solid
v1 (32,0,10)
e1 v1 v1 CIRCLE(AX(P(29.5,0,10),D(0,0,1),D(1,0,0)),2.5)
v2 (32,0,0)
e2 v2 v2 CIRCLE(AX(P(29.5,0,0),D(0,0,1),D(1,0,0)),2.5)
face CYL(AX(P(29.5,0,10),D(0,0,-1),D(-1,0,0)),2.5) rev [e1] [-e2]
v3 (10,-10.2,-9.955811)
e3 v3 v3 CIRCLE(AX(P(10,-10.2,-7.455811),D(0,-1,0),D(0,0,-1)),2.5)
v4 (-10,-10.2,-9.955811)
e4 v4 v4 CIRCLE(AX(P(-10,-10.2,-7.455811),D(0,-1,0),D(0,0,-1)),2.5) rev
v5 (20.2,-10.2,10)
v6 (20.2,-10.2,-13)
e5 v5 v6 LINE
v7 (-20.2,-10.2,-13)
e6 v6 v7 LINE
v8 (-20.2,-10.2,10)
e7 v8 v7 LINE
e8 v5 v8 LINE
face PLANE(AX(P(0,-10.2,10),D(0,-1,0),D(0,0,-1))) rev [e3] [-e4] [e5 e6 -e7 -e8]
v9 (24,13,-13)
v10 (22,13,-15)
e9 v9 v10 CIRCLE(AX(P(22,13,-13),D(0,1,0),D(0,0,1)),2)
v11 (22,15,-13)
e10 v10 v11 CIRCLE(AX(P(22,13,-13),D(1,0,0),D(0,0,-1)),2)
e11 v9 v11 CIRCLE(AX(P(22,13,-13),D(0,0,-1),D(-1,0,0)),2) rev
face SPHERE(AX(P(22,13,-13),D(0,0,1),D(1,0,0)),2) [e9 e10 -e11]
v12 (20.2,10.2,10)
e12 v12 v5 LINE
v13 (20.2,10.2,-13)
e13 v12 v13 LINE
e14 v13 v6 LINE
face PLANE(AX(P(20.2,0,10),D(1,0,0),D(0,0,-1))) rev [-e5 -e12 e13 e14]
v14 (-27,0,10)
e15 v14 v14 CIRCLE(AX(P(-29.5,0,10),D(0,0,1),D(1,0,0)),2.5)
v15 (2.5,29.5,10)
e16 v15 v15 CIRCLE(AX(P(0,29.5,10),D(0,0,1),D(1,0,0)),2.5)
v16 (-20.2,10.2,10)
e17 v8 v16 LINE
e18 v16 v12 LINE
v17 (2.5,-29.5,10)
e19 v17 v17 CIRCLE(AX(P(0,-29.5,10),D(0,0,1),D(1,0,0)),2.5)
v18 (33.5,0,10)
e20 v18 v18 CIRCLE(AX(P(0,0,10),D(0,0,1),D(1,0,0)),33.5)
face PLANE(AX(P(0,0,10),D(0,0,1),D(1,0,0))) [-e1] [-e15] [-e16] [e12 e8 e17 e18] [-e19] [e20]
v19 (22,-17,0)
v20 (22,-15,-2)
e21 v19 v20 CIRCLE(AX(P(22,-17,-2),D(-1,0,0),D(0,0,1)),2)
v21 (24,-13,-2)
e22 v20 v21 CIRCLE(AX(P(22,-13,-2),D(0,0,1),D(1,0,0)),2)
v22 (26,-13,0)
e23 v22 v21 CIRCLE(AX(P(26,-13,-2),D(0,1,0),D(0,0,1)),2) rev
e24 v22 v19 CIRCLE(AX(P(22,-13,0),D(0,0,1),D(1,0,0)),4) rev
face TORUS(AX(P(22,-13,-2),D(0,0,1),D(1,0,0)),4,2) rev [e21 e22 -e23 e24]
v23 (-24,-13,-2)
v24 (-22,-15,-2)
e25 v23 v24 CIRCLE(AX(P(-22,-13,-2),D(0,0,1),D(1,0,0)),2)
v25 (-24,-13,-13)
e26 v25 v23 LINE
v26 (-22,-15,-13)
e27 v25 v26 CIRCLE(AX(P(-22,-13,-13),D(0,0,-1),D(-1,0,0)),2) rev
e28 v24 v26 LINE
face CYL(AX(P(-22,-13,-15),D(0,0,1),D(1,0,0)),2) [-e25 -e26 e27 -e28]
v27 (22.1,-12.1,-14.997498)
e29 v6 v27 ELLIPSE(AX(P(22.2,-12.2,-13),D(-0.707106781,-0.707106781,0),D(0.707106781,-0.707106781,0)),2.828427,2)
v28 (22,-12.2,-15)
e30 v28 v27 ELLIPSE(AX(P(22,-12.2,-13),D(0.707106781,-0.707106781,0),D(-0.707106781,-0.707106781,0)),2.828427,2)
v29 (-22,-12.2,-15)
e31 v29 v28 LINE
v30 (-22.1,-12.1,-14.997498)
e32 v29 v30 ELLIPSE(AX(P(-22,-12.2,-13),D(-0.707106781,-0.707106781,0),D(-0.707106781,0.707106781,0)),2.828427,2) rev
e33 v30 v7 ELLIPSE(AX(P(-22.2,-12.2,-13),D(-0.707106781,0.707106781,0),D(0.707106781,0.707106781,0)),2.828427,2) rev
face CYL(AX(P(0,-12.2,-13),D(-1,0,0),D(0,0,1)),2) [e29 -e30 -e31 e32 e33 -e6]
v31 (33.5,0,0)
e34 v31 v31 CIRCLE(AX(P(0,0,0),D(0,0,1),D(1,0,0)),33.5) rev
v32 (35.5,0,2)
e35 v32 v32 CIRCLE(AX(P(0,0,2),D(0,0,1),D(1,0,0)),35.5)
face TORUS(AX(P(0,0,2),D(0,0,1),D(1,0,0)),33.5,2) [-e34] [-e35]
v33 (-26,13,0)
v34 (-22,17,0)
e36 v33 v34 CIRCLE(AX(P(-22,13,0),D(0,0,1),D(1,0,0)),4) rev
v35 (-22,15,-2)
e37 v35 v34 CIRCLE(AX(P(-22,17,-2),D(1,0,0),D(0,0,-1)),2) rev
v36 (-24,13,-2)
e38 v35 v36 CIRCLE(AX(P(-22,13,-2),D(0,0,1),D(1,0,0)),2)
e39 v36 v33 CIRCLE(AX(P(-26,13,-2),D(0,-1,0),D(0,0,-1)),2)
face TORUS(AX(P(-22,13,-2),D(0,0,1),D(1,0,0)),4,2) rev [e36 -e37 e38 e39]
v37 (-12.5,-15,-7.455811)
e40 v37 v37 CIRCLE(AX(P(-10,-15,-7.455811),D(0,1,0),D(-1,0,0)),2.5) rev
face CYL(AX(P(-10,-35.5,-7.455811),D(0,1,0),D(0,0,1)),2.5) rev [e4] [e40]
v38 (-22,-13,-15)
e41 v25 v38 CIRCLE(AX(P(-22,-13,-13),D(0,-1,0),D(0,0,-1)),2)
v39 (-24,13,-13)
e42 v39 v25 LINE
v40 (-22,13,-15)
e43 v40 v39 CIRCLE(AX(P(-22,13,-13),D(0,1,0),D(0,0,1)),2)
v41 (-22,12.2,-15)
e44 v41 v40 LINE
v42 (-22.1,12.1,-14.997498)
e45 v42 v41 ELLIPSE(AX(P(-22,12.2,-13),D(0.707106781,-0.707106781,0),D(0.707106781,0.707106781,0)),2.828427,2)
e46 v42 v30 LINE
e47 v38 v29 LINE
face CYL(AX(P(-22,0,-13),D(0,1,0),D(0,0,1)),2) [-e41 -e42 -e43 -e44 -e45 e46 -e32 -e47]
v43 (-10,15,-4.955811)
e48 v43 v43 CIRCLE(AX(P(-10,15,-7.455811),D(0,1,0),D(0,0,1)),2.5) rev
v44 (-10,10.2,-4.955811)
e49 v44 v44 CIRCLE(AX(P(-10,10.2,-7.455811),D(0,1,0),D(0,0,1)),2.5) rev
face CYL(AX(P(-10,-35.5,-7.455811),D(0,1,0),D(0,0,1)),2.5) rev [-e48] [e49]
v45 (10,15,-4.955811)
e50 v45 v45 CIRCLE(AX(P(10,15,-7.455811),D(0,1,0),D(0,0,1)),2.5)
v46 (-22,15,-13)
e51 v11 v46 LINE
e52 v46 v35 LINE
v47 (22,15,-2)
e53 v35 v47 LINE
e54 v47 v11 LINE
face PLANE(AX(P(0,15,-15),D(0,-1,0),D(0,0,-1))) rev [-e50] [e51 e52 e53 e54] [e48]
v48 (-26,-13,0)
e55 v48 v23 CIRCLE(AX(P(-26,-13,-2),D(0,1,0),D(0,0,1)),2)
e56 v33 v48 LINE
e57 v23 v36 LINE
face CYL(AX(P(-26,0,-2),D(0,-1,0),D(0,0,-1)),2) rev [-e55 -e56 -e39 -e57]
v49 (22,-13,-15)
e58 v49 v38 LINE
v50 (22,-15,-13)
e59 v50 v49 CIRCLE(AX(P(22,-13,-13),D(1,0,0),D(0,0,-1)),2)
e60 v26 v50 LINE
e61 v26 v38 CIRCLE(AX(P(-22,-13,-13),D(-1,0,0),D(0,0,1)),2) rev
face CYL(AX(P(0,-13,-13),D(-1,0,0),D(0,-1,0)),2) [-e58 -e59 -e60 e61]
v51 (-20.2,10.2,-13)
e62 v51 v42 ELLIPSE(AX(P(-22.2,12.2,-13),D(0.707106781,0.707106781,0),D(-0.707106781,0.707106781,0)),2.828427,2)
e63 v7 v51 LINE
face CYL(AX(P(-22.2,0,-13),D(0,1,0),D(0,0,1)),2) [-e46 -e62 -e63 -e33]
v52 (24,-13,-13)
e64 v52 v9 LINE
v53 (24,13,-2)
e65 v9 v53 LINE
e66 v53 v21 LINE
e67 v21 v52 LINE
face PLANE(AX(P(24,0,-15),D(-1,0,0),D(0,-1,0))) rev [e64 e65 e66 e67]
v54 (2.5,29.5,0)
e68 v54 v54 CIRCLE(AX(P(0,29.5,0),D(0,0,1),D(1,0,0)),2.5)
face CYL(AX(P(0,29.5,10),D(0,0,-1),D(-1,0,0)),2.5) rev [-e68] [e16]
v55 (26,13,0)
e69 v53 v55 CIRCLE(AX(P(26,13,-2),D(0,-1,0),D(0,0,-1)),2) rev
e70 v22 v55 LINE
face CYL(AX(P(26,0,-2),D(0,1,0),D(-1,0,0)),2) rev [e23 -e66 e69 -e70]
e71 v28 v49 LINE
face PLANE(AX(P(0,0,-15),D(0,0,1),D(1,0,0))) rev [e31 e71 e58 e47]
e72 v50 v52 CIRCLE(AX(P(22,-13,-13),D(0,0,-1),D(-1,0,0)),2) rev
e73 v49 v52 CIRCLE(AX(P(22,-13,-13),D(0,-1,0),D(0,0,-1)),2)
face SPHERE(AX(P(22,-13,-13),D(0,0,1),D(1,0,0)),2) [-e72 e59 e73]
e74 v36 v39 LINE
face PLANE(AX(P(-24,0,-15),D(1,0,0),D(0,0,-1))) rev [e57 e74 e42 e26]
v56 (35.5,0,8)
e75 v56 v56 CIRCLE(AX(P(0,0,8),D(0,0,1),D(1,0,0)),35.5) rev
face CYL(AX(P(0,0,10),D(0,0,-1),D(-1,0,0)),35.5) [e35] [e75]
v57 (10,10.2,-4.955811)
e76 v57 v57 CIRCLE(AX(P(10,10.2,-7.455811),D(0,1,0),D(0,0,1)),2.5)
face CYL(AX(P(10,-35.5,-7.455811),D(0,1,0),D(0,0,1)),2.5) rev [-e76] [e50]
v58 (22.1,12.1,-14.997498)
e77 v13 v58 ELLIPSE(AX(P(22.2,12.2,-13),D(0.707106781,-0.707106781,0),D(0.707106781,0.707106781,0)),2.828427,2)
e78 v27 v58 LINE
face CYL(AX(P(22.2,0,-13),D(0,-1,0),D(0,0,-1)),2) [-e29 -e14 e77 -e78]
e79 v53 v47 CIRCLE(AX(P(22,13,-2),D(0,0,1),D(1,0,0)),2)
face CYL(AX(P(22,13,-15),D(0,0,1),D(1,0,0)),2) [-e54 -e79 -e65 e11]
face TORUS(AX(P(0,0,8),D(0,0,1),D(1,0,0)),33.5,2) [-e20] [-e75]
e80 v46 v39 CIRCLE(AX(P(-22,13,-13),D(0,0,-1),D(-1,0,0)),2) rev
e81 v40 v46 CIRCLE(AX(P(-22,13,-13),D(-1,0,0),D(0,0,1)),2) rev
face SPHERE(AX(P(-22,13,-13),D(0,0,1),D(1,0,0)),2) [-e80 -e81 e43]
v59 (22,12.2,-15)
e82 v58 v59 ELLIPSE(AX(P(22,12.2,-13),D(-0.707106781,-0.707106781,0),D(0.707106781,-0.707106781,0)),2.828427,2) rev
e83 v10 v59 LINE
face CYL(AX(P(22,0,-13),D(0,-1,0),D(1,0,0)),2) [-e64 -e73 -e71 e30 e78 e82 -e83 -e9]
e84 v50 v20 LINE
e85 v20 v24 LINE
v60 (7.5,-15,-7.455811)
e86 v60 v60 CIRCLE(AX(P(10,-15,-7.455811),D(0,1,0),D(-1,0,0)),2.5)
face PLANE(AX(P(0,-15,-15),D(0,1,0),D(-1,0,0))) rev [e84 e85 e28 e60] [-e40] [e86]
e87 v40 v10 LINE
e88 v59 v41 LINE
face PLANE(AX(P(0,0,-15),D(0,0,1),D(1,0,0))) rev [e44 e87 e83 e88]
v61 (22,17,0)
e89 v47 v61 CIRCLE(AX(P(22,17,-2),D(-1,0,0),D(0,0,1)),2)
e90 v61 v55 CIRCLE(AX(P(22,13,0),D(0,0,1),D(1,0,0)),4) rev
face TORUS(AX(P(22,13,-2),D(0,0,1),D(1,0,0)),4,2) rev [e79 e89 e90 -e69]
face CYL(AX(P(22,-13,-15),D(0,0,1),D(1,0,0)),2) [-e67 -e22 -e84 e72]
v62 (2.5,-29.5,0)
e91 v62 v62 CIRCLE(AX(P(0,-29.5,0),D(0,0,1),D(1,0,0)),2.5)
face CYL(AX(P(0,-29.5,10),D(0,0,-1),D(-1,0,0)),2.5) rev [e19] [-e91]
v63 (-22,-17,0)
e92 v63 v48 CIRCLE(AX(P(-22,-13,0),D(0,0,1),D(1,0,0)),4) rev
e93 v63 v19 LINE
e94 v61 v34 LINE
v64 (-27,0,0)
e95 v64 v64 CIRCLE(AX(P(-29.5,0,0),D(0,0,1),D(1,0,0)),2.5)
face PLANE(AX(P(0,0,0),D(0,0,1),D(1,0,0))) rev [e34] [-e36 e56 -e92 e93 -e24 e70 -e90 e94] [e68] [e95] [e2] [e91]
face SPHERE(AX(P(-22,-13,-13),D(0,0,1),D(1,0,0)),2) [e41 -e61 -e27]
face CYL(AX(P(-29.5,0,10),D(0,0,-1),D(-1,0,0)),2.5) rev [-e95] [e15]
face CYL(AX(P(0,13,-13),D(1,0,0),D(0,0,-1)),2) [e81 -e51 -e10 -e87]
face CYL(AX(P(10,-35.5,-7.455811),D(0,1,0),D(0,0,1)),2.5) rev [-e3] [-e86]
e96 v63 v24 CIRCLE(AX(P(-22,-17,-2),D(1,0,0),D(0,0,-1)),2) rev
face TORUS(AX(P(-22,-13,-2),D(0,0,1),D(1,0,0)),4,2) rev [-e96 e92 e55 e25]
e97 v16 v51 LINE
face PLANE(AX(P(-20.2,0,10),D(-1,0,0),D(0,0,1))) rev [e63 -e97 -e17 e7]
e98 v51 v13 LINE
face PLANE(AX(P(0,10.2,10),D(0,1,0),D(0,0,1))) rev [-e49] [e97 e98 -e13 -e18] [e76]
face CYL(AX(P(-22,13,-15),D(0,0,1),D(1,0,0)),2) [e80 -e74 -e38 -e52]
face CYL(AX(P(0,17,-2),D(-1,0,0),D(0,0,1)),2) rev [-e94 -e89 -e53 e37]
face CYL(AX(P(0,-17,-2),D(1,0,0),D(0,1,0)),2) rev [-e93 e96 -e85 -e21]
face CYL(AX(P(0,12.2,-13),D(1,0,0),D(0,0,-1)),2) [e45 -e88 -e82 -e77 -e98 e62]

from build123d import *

# Parameters (mm, degrees)
SKETCH_1_R          = 35.5
SKETCH_1_W          = 40.4
SKETCH_1_H          = 20.4
SKETCH_1_R_2        = 2.5
EXTRUDE_1_DEPTH     = 10
EXTRUDE_2_DEPTH     = 15
FILLET_1_R          = 2
SKETCH_3_R          = 2.5
CUT_EXTRUDE_1_DEPTH = 64.525585397
FILLET_2_R          = 2


with BuildPart() as part:
    # 草图1 → 凸台-拉伸1 (new body)
    with BuildSketch(Plane.XY):
        Circle(SKETCH_1_R)
        Rectangle(SKETCH_1_W, SKETCH_1_H, mode=Mode.SUBTRACT)
        with Locations((29.5, 0)):
            Circle(SKETCH_1_R_2, mode=Mode.SUBTRACT)
        with Locations((0, 29.5)):
            Circle(SKETCH_1_R_2, mode=Mode.SUBTRACT)
        with Locations((-29.5, 0)):
            Circle(SKETCH_1_R_2, mode=Mode.SUBTRACT)
        with Locations((0, -29.5)):
            Circle(SKETCH_1_R_2, mode=Mode.SUBTRACT)
    extrude(amount=EXTRUDE_1_DEPTH)

    # 草图1<5> → 凸台-拉伸2 (add)
    # profile 1 of 3: a face of its own
    with BuildSketch(Plane.XY):
        with BuildLine():
            Line((18.090052515, 15), (0, 15))
            Line((0, 15), (-18.090052515, 15))
            ThreePointArc((-18.090052515, 15), (-23.5, 0), (-18.090052515, -15))
            Line((-18.090052515, -15), (18.090052515, -15))
            ThreePointArc((18.090052515, -15), (22.106178255, -7.97288423), (23.5, 0))
            ThreePointArc((23.5, 0), (22.106178255, 7.97288423), (18.090052515, 15))
        make_face()
        Polygon((-20.2, -10.2), (-20.2, 0), (-20.2, 10.2), (0, 10.2), (20.2, 10.2), (20.2, 0), (20.2, -10.2), align=None, mode=Mode.SUBTRACT)
    # profile 2 of 3: a face of its own
    with BuildSketch(Plane.XY):
        with BuildLine():
            Line((24, 15), (18.090052515, 15))
            ThreePointArc((18.090052515, 15), (22.106178255, 7.97288423), (23.5, 0))
            ThreePointArc((23.5, 0), (22.106178255, -7.97288423), (18.090052515, -15))
            Line((18.090052515, -15), (24, -15))
            Line((24, -15), (24, 15))
        make_face()
    # profile 3 of 3: a face of its own
    with BuildSketch(Plane.XY):
        with BuildLine():
            ThreePointArc((-18.090052515, -15), (-23.5, 0), (-18.090052515, 15))
            Line((-18.090052515, 15), (-24, 15))
            Line((-24, 15), (-24, -15))
            Line((-24, -15), (-18.090052515, -15))
        make_face()
    extrude(amount=-EXTRUDE_2_DEPTH)

    # 圆角1
    # the kernel refuses this fillet: 2 mm, written as the material it takes off along each edge
    with BuildSketch(Plane(origin=(-22, 13, -13), x_dir=(0, 1, 0), z_dir=(-1, 0, 0))) as fillet_1_piece_1_section:
        Polygon((0, 0), (FILLET_1_R, 0), (FILLET_1_R, FILLET_1_R), (0, FILLET_1_R), align=None)
    fillet_1_piece_1 = extrude(amount=FILLET_1_R, mode=Mode.PRIVATE)
    fillet_1_piece_1 = fillet_1_piece_1 - Plane(origin=(-22, 13, -13), x_dir=(0, -0.7071067811865475, 0.7071067811865475), z_dir=(-1, 0, 0)) * Sphere(FILLET_1_R, mode=Mode.PRIVATE)
    add(fillet_1_piece_1, mode=Mode.SUBTRACT)
    with BuildSketch(Plane(origin=(22, 13, -13), x_dir=(1, 0, 0), z_dir=(0, 1, 0))) as fillet_1_piece_2_section:
        Polygon((0, 0), (FILLET_1_R, 0), (FILLET_1_R, FILLET_1_R), (0, FILLET_1_R), align=None)
    fillet_1_piece_2 = extrude(amount=FILLET_1_R, mode=Mode.PRIVATE)
    fillet_1_piece_2 = fillet_1_piece_2 - Plane(origin=(22, 13, -13), x_dir=(-0.7071067811865475, 0, 0.7071067811865475), z_dir=(0, 1, 0)) * Sphere(FILLET_1_R, mode=Mode.PRIVATE)
    add(fillet_1_piece_2, mode=Mode.SUBTRACT)
    with BuildSketch(Plane(origin=(22, -13, -13), x_dir=(0, -1, 0), z_dir=(1, 0, 0))) as fillet_1_piece_3_section:
        Polygon((0, 0), (FILLET_1_R, 0), (FILLET_1_R, FILLET_1_R), (0, FILLET_1_R), align=None)
    fillet_1_piece_3 = extrude(amount=FILLET_1_R, mode=Mode.PRIVATE)
    fillet_1_piece_3 = fillet_1_piece_3 - Plane(origin=(22, -13, -13), x_dir=(0, 0.7071067811865475, 0.7071067811865475), z_dir=(1, 0, 0)) * Sphere(FILLET_1_R, mode=Mode.PRIVATE)
    add(fillet_1_piece_3, mode=Mode.SUBTRACT)
    with BuildSketch(Plane(origin=(-22, -13, -13), x_dir=(0, -1, 0), z_dir=(-1, 0, 0))) as fillet_1_piece_4_section:
        Polygon((0, 0), (FILLET_1_R, 0), (FILLET_1_R, -FILLET_1_R), (0, -FILLET_1_R), align=None)
    fillet_1_piece_4 = extrude(amount=FILLET_1_R, mode=Mode.PRIVATE)
    fillet_1_piece_4 = fillet_1_piece_4 - Plane(origin=(-22, -13, -13), x_dir=(0, 0.7071067811865475, 0.7071067811865475), z_dir=(-1, 0, 0)) * Sphere(FILLET_1_R, mode=Mode.PRIVATE)
    add(fillet_1_piece_4, mode=Mode.SUBTRACT)
    with BuildSketch(Plane(origin=(-24, 15, 0), x_dir=(0, -1, 0), z_dir=(0, 0, -1)), Plane(origin=(24, 15, 0), x_dir=(-1, 0, 0), z_dir=(0, 0, -1)), Plane(origin=(24, -15, 0), x_dir=(0, 1, 0), z_dir=(0, 0, -1))) as fillet_1_piece_5:
        with BuildLine():
            CenterArc((FILLET_1_R, -FILLET_1_R), FILLET_1_R, 90, 90)
            Line((0, -FILLET_1_R), (0, 0))
            Line((0, 0), (FILLET_1_R, 0))
        make_face()
    extrude(amount=13, mode=Mode.SUBTRACT)
    with BuildSketch(Plane(origin=(20.2, -10.2, -15), x_dir=(0, -1, 0), z_dir=(-1, 0, 0)), Plane(origin=(-20.2, 10.2, -15), x_dir=(0, 1, 0), z_dir=(1, 0, 0))) as fillet_1_piece_6:
        with BuildLine():
            CenterArc((FILLET_1_R, FILLET_1_R), FILLET_1_R, 180, 90)
            Line((0, FILLET_1_R), (0, 0))
            Line((0, 0), (FILLET_1_R, 0))
        make_face()
    extrude(amount=40.4, mode=Mode.SUBTRACT)
    with BuildSketch(Plane(origin=(20.2, 10.2, -15), x_dir=(1, 0, 0), z_dir=(0, -1, 0))) as fillet_1_piece_7:
        with BuildLine():
            CenterArc((FILLET_1_R, FILLET_1_R), FILLET_1_R, 180, 90)
            Line((0, FILLET_1_R), (0, 0))
            Line((0, 0), (FILLET_1_R, 0))
        make_face()
    extrude(amount=20.4, mode=Mode.SUBTRACT)
    with BuildSketch(Plane(origin=(-20.2, -10.2, -15), x_dir=(0, 0, 1), z_dir=(0, 1, 0))) as fillet_1_piece_8:
        with BuildLine():
            CenterArc((FILLET_1_R, -FILLET_1_R), FILLET_1_R, 90, 90)
            Line((0, -FILLET_1_R), (0, 0))
            Line((0, 0), (FILLET_1_R, 0))
        make_face()
    extrude(amount=20.4, mode=Mode.SUBTRACT)
    with BuildSketch(Plane(origin=(-24, -15, 0), x_dir=(0, 1, 0), z_dir=(0, 0, -1))) as fillet_1_piece_9:
        with BuildLine():
            CenterArc((FILLET_1_R, FILLET_1_R), FILLET_1_R, 180, 90)
            Line((0, FILLET_1_R), (0, 0))
            Line((0, 0), (FILLET_1_R, 0))
        make_face()
    extrude(amount=13, mode=Mode.SUBTRACT)
    with BuildSketch(Plane(origin=(22, 15, -15), x_dir=(0, -1, 0), z_dir=(-1, 0, 0))) as fillet_1_piece_10:
        with BuildLine():
            CenterArc((FILLET_1_R, FILLET_1_R), FILLET_1_R, 180, 90)
            Line((0, FILLET_1_R), (0, 0))
            Line((0, 0), (FILLET_1_R, 0))
        make_face()
    extrude(amount=44, mode=Mode.SUBTRACT)
    with BuildSketch(Plane(origin=(24, -13, -15), x_dir=(-1, 0, 0), z_dir=(0, 1, 0)), Plane(origin=(-24, 13, -15), x_dir=(1, 0, 0), z_dir=(0, -1, 0))) as fillet_1_piece_11:
        with BuildLine():
            CenterArc((FILLET_1_R, FILLET_1_R), FILLET_1_R, 180, 90)
            Line((0, FILLET_1_R), (0, 0))
            Line((0, 0), (FILLET_1_R, 0))
        make_face()
    extrude(amount=26, mode=Mode.SUBTRACT)
    with BuildSketch(Plane(origin=(22, -15, -15), x_dir=(0, 1, 0), z_dir=(-1, 0, 0))) as fillet_1_piece_12:
        with BuildLine():
            CenterArc((FILLET_1_R, -FILLET_1_R), FILLET_1_R, 90, 90)
            Line((0, -FILLET_1_R), (0, 0))
            Line((0, 0), (FILLET_1_R, 0))
        make_face()
    extrude(amount=44, mode=Mode.SUBTRACT)
    with BuildSketch(Plane(origin=(25.2, -10.2, -15), x_dir=(0, -1, 0), z_dir=(-1, 0, 0))) as fillet_1_piece_13a_section:
        with BuildLine():
            CenterArc((FILLET_1_R, FILLET_1_R), FILLET_1_R, 180, 90)
            Line((0, FILLET_1_R), (0, 0))
            Line((0, 0), (FILLET_1_R, 0))
        make_face()
    fillet_1_piece_13a = extrude(amount=45.4, mode=Mode.PRIVATE)
    fillet_1_piece_13a = split(fillet_1_piece_13a, bisect_by=Plane(origin=(20.2, -10.652790229, -14.547209771), z_dir=(1, 0, 0)), keep=Keep.TOP, mode=Mode.PRIVATE)
    with BuildSketch(Plane(origin=(20.2, 10.2, -15), x_dir=(1, 0, 0), z_dir=(0, -1, 0))) as fillet_1_piece_13b_section:
        with BuildLine():
            CenterArc((FILLET_1_R, FILLET_1_R), FILLET_1_R, 180, 90)
            Line((0, FILLET_1_R), (0, 0))
            Line((0, 0), (FILLET_1_R, 0))
        make_face()
    fillet_1_piece_13b = extrude(amount=25.4, mode=Mode.PRIVATE)
    fillet_1_piece_13b = split(fillet_1_piece_13b, bisect_by=Plane(origin=(20.652790229, -10.2, -14.547209771), z_dir=(0, -1, 0)), keep=Keep.TOP, mode=Mode.PRIVATE)
    fillet_1_piece_13 = fillet_1_piece_13a & fillet_1_piece_13b
    add(fillet_1_piece_13, mode=Mode.SUBTRACT)
    with BuildSketch(Plane(origin=(-20.2, -15.2, -15), x_dir=(0, 0, 1), z_dir=(0, 1, 0))) as fillet_1_piece_14a_section:
        with BuildLine():
            CenterArc((FILLET_1_R, -FILLET_1_R), FILLET_1_R, 90, 90)
            Line((0, -FILLET_1_R), (0, 0))
            Line((0, 0), (FILLET_1_R, 0))
        make_face()
    fillet_1_piece_14a = extrude(amount=25.4, mode=Mode.PRIVATE)
    fillet_1_piece_14a = split(fillet_1_piece_14a, bisect_by=Plane(origin=(-20.652790229, -10.2, -14.547209771), z_dir=(0, -1, 0)), keep=Keep.TOP, mode=Mode.PRIVATE)
    with BuildSketch(Plane(origin=(20.2, -10.2, -15), x_dir=(0, -1, 0), z_dir=(-1, 0, 0))) as fillet_1_piece_14b_section:
        with BuildLine():
            CenterArc((FILLET_1_R, FILLET_1_R), FILLET_1_R, 180, 90)
            Line((0, FILLET_1_R), (0, 0))
            Line((0, 0), (FILLET_1_R, 0))
        make_face()
    fillet_1_piece_14b = extrude(amount=45.4, mode=Mode.PRIVATE)
    fillet_1_piece_14b = split(fillet_1_piece_14b, bisect_by=Plane(origin=(-20.2, -10.652790229, -14.547209771), z_dir=(-1, 0, 0)), keep=Keep.TOP, mode=Mode.PRIVATE)
    fillet_1_piece_14 = fillet_1_piece_14a & fillet_1_piece_14b
    add(fillet_1_piece_14, mode=Mode.SUBTRACT)
    with BuildSketch(Plane(origin=(-20.2, 10.2, -15), x_dir=(0, 1, 0), z_dir=(1, 0, 0))) as fillet_1_piece_15a_section:
        with BuildLine():
            CenterArc((FILLET_1_R, FILLET_1_R), FILLET_1_R, 180, 90)
            Line((0, FILLET_1_R), (0, 0))
            Line((0, 0), (FILLET_1_R, 0))
        make_face()
    fillet_1_piece_15a = extrude(amount=45.4, mode=Mode.PRIVATE)
    fillet_1_piece_15a = split(fillet_1_piece_15a, bisect_by=Plane(origin=(20.2, 10.652790229, -14.547209771), z_dir=(1, 0, 0)), keep=Keep.TOP, mode=Mode.PRIVATE)
    with BuildSketch(Plane(origin=(20.2, 15.2, -15), x_dir=(1, 0, 0), z_dir=(0, -1, 0))) as fillet_1_piece_15b_section:
        with BuildLine():
            CenterArc((FILLET_1_R, FILLET_1_R), FILLET_1_R, 180, 90)
            Line((0, FILLET_1_R), (0, 0))
            Line((0, 0), (FILLET_1_R, 0))
        make_face()
    fillet_1_piece_15b = extrude(amount=25.4, mode=Mode.PRIVATE)
    fillet_1_piece_15b = split(fillet_1_piece_15b, bisect_by=Plane(origin=(20.652790229, 10.2, -14.547209771), z_dir=(0, 1, 0)), keep=Keep.TOP, mode=Mode.PRIVATE)
    fillet_1_piece_15 = fillet_1_piece_15a & fillet_1_piece_15b
    add(fillet_1_piece_15, mode=Mode.SUBTRACT)
    with BuildSketch(Plane(origin=(-20.2, -10.2, -15), x_dir=(0, 0, 1), z_dir=(0, 1, 0))) as fillet_1_piece_16a_section:
        with BuildLine():
            CenterArc((FILLET_1_R, -FILLET_1_R), FILLET_1_R, 90, 90)
            Line((0, -FILLET_1_R), (0, 0))
            Line((0, 0), (FILLET_1_R, 0))
        make_face()
    fillet_1_piece_16a = extrude(amount=25.4, mode=Mode.PRIVATE)
    fillet_1_piece_16a = split(fillet_1_piece_16a, bisect_by=Plane(origin=(-20.652790229, 10.2, -14.547209771), z_dir=(0, 1, 0)), keep=Keep.TOP, mode=Mode.PRIVATE)
    with BuildSketch(Plane(origin=(-25.2, 10.2, -15), x_dir=(0, 1, 0), z_dir=(1, 0, 0))) as fillet_1_piece_16b_section:
        with BuildLine():
            CenterArc((FILLET_1_R, FILLET_1_R), FILLET_1_R, 180, 90)
            Line((0, FILLET_1_R), (0, 0))
            Line((0, 0), (FILLET_1_R, 0))
        make_face()
    fillet_1_piece_16b = extrude(amount=45.4, mode=Mode.PRIVATE)
    fillet_1_piece_16b = split(fillet_1_piece_16b, bisect_by=Plane(origin=(-20.2, 10.652790229, -14.547209771), z_dir=(-1, 0, 0)), keep=Keep.TOP, mode=Mode.PRIVATE)
    fillet_1_piece_16 = fillet_1_piece_16a & fillet_1_piece_16b
    add(fillet_1_piece_16, mode=Mode.SUBTRACT)
    # the kernel refuses this fillet: 2 mm, written as the material it adds along each edge
    with BuildSketch(Plane(origin=(-22, 15, 0), x_dir=(0, 0, -1), z_dir=(1, 0, 0))) as fillet_1_2_piece_1:
        with BuildLine():
            CenterArc((FILLET_1_R, FILLET_1_R), FILLET_1_R, 180, 90)
            Line((0, FILLET_1_R), (0, 0))
            Line((0, 0), (FILLET_1_R, 0))
        make_face()
    extrude(amount=44)
    with BuildSketch(Plane(origin=(24, -13, 0), x_dir=(0, 0, -1), z_dir=(0, 1, 0)), Plane(origin=(-24, 13, 0), x_dir=(0, 0, -1), z_dir=(0, -1, 0))) as fillet_1_2_piece_2:
        with BuildLine():
            CenterArc((FILLET_1_R, -FILLET_1_R), FILLET_1_R, 90, 90)
            Line((0, -FILLET_1_R), (0, 0))
            Line((0, 0), (FILLET_1_R, 0))
        make_face()
    extrude(amount=26)
    with BuildSketch(Plane(origin=(-22, -15, 0), x_dir=(0, 0, -1), z_dir=(1, 0, 0))) as fillet_1_2_piece_3:
        with BuildLine():
            CenterArc((FILLET_1_R, -FILLET_1_R), FILLET_1_R, 90, 90)
            Line((0, -FILLET_1_R), (0, 0))
            Line((0, 0), (FILLET_1_R, 0))
        make_face()
    extrude(amount=44)
    with BuildSketch(Plane(origin=(-22, 13, 0), x_dir=(-1, 0, 0), z_dir=(0, -1, 0))) as fillet_1_2_piece_4:
        with BuildLine():
            CenterArc((2 + FILLET_1_R, FILLET_1_R), FILLET_1_R, 180, 90)
            Line((2 + FILLET_1_R, 0), (2, 0))
            Line((2, 0), (2, FILLET_1_R))
        make_face()
    revolve(axis=Axis((-22, 13, 0), (0, 0, -1)), revolution_arc=90)
    with BuildSketch(Plane(origin=(-22, -13, 0), x_dir=(-1, 0, 0), z_dir=(0, 1, 0))) as fillet_1_2_piece_5:
        with BuildLine():
            CenterArc((2 + FILLET_1_R, -FILLET_1_R), FILLET_1_R, 90, 90)
            Line((2 + FILLET_1_R, 0), (2, 0))
            Line((2, 0), (2, -FILLET_1_R))
        make_face()
    revolve(axis=Axis((-22, -13, 0), (0, 0, 1)), revolution_arc=90)
    with BuildSketch(Plane(origin=(22, -13, 0), x_dir=(1, 0, 0), z_dir=(0, 1, 0))) as fillet_1_2_piece_6:
        with BuildLine():
            CenterArc((2 + FILLET_1_R, FILLET_1_R), FILLET_1_R, 180, 90)
            Line((2 + FILLET_1_R, 0), (2, 0))
            Line((2, 0), (2, FILLET_1_R))
        make_face()
    revolve(axis=Axis((22, -13, 0), (0, 0, -1)), revolution_arc=90)
    with BuildSketch(Plane(origin=(22, 13, 0), x_dir=(0, 1, 0), z_dir=(-1, 0, 0))) as fillet_1_2_piece_7:
        with BuildLine():
            CenterArc((2 + FILLET_1_R, FILLET_1_R), FILLET_1_R, 180, 90)
            Line((2 + FILLET_1_R, 0), (2, 0))
            Line((2, 0), (2, FILLET_1_R))
        make_face()
    revolve(axis=Axis((22, 13, 0), (0, 0, -1)), revolution_arc=90)

    # 草图3 → 切除-拉伸1 (cut, through all)
    with BuildSketch(Plane(origin=(0, 15, 0), x_dir=(1, 0, 0), z_dir=(0, 1, 0))):
        with Locations(Location((10, 7.455811309, 0), (0, 0, 180))):
            Circle(SKETCH_3_R)
        with Locations(Location((-10, 7.455811309, 0), (0, 0, 180))):
            Circle(SKETCH_3_R)
    extrude(amount=-CUT_EXTRUDE_1_DEPTH, mode=Mode.SUBTRACT)

    # 圆角2
    fillet_2_edges = [part.edges().sort_by_distance(p)[0] for p in [
        (-35.5, 0, 0),
        (-35.5, 0, 10),
    ]]
    fillet(fillet_2_edges, radius=FILLET_2_R)


solid = part.part
